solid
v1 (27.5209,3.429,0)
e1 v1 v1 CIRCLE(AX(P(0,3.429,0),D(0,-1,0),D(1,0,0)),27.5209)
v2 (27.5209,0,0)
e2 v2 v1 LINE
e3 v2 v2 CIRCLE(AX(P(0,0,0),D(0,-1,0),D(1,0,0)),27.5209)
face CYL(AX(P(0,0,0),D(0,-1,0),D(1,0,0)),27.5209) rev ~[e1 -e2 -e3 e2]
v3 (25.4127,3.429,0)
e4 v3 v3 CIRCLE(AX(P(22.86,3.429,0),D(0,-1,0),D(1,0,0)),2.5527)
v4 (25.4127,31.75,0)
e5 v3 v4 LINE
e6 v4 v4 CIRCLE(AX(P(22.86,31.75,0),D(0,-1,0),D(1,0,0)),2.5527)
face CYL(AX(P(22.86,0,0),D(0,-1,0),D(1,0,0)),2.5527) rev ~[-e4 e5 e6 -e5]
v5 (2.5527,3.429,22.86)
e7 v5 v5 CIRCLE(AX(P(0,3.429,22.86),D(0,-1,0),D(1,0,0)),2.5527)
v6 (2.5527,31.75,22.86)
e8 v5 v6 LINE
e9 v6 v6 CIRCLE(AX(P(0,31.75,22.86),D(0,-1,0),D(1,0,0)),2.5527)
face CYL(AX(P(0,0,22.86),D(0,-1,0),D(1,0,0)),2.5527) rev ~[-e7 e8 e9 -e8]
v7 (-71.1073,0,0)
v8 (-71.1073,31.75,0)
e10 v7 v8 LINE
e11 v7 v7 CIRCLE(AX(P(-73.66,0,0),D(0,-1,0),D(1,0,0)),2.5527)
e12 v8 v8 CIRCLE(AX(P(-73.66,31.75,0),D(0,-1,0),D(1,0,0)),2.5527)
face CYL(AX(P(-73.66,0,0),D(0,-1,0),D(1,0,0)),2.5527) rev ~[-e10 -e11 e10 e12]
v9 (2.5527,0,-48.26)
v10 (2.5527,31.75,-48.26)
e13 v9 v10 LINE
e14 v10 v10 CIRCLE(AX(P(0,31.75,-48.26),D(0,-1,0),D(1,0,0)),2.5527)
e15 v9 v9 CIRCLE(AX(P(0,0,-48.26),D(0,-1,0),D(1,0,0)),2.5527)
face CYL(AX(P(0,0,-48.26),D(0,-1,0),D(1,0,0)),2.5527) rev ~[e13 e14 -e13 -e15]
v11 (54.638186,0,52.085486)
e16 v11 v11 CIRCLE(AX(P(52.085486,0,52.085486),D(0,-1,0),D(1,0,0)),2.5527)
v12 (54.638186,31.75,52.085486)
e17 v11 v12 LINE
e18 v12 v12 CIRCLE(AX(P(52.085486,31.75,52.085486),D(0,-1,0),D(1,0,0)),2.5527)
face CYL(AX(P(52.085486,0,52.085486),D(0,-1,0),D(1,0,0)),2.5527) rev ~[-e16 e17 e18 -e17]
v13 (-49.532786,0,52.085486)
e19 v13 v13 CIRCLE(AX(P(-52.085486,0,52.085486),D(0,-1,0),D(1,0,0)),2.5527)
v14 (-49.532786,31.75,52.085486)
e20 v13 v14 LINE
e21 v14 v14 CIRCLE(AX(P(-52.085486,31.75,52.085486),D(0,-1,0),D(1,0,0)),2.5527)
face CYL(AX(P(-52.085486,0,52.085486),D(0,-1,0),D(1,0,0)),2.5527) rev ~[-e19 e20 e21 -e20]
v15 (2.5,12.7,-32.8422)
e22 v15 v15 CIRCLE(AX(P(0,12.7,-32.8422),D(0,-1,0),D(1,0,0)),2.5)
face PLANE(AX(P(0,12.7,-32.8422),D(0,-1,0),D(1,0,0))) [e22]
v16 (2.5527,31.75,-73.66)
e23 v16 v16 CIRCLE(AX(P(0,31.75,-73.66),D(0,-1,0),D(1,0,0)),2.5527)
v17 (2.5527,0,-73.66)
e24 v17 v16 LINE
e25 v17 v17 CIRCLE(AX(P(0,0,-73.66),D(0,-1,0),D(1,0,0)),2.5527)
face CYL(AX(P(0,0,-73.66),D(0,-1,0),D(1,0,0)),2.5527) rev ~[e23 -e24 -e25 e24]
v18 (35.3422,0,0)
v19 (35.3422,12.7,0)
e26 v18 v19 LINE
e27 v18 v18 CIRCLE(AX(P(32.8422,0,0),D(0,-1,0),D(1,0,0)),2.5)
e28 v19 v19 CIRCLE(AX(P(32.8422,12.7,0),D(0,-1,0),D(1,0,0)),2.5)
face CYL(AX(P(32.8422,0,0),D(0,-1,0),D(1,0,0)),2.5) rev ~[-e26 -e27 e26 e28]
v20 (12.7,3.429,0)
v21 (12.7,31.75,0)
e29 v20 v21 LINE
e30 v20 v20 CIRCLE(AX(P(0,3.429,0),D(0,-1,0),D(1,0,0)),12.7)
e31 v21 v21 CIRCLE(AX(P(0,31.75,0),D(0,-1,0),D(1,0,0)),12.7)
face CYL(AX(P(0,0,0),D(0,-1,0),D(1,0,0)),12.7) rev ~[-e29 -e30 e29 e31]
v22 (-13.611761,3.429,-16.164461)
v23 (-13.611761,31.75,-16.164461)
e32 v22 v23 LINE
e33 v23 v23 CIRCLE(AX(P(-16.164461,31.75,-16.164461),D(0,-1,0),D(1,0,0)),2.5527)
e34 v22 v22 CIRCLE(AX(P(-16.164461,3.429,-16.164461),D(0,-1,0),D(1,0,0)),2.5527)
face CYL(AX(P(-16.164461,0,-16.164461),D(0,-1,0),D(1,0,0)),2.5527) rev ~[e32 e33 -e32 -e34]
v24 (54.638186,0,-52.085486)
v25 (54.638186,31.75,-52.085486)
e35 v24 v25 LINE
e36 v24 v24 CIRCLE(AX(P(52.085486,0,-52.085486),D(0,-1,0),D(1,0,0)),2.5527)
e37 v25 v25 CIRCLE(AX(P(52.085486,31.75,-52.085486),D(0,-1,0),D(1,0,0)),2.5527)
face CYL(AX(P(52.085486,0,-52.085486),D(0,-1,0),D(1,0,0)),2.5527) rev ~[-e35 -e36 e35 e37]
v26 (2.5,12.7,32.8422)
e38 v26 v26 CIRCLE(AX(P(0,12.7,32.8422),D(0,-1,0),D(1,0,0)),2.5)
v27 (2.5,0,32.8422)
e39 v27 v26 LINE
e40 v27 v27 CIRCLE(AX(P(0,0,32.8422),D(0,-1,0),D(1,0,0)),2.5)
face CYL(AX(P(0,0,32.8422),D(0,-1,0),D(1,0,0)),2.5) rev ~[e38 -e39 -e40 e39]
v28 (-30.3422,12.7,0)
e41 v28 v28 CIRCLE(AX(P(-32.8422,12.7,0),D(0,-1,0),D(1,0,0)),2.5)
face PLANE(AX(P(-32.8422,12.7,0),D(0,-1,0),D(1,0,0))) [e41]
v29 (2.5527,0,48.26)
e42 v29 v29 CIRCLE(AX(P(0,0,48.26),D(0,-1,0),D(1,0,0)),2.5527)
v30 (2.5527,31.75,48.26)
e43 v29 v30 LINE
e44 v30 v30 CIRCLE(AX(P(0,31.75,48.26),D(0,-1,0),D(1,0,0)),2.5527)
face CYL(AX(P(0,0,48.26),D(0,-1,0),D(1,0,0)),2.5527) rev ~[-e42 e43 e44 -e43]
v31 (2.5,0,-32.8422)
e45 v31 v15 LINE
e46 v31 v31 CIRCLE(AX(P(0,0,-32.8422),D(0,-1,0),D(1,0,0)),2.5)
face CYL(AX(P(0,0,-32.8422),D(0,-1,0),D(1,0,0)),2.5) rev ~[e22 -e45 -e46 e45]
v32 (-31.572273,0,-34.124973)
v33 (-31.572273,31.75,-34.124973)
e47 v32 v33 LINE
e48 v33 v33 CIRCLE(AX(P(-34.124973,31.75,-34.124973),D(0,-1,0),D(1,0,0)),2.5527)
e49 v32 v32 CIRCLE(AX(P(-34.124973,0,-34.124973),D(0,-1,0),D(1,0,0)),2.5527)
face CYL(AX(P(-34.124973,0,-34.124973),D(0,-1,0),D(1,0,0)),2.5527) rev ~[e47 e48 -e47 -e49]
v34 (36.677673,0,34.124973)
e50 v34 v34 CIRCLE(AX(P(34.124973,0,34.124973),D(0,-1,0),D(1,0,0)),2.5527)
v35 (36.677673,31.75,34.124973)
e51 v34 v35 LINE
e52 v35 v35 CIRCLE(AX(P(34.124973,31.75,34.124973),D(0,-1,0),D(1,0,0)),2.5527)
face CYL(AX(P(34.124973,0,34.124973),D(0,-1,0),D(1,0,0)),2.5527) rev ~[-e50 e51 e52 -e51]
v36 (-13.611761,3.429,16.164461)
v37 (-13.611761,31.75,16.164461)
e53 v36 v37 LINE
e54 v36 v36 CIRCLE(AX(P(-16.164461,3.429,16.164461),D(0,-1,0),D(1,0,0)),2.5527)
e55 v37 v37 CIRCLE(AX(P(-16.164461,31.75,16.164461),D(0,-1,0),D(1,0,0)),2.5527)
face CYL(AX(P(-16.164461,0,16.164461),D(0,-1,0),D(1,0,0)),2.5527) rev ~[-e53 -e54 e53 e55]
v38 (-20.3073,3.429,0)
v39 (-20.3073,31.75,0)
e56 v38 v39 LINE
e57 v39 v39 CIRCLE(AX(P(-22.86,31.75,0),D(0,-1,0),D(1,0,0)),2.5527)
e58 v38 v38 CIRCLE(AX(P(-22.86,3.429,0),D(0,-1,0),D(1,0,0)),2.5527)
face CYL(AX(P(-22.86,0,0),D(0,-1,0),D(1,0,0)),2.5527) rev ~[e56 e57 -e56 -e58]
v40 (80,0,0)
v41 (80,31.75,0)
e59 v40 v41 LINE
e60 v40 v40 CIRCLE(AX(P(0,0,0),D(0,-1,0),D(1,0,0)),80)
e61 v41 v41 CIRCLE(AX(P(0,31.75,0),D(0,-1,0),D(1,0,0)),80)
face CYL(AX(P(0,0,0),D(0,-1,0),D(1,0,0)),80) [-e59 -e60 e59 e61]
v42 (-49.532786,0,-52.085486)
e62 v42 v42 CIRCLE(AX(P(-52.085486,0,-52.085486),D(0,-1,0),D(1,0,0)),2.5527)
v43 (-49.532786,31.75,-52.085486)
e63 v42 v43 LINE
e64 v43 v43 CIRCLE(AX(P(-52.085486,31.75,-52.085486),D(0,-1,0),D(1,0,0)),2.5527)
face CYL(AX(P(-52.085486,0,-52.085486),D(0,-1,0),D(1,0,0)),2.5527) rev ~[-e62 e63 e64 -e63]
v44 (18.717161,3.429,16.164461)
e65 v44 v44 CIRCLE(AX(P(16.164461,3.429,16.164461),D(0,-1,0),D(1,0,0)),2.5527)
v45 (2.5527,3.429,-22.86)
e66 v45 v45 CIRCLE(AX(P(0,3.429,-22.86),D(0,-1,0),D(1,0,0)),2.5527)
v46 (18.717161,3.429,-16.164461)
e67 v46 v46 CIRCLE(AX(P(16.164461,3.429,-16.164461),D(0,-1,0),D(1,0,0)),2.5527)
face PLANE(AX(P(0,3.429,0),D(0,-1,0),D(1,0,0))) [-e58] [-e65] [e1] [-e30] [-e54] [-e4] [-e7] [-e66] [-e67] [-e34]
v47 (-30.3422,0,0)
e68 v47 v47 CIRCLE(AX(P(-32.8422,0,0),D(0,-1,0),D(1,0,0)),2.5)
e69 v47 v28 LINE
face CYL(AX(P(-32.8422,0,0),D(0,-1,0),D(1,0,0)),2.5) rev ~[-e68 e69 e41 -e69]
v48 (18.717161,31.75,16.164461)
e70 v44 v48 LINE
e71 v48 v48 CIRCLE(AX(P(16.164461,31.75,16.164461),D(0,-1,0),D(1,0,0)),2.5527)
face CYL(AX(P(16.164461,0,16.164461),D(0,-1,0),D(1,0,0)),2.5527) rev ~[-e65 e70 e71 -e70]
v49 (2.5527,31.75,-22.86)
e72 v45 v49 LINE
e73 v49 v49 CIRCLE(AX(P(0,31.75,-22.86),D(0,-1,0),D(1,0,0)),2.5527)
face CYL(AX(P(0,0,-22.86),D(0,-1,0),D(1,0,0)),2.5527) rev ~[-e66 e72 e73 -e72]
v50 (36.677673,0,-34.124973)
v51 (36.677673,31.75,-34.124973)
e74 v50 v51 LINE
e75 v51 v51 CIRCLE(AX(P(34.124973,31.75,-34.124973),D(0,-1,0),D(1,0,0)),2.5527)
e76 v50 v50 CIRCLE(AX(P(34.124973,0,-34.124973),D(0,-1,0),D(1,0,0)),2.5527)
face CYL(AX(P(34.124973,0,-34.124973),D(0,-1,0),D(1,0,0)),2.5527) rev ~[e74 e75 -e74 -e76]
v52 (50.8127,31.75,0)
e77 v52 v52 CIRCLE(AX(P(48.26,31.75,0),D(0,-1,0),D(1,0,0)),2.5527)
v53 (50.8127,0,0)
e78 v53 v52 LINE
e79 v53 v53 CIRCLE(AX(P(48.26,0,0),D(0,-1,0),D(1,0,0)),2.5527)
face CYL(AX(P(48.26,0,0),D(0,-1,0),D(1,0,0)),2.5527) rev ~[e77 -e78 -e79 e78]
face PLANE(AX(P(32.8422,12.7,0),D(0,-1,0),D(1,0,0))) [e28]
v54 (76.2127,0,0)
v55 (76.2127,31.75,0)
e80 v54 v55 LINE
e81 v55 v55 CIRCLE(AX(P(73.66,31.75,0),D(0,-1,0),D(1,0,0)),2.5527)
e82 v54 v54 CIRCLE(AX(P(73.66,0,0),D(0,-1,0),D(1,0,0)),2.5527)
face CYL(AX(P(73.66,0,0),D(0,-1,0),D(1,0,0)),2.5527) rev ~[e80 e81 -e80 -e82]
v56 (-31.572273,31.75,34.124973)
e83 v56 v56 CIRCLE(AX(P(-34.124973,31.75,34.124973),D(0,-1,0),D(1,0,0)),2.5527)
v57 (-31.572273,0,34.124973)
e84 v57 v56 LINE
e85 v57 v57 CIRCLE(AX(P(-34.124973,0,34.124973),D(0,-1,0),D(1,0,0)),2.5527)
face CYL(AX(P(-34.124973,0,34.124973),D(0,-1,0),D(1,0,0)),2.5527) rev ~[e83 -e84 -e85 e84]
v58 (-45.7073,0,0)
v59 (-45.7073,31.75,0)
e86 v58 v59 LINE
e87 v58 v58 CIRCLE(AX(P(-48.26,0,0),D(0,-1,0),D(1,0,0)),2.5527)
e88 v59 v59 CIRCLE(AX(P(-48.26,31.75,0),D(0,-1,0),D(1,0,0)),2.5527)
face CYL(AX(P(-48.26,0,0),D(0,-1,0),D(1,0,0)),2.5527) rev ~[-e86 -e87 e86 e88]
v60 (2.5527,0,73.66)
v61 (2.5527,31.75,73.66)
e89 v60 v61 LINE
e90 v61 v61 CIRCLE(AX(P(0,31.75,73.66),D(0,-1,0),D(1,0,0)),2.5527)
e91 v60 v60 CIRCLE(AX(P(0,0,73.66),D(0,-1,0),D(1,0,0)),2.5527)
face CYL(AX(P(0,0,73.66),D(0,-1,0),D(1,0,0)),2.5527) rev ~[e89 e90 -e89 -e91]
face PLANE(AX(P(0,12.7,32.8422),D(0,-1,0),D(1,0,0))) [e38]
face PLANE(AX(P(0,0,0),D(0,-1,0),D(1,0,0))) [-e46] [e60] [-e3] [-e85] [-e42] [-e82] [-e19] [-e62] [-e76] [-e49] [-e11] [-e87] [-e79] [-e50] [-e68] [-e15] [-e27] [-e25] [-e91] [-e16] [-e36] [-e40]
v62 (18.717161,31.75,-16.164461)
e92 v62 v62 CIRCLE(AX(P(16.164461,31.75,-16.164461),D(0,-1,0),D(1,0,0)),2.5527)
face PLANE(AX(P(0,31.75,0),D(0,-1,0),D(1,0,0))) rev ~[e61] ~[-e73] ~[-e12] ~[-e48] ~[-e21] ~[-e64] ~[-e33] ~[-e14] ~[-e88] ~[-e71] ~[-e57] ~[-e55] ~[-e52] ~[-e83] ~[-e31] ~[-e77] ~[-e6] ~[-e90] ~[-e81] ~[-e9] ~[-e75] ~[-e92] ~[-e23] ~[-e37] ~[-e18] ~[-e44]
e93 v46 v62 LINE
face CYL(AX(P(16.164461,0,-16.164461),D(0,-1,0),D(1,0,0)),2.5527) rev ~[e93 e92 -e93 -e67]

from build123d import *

# Parameters (mm, degrees)
F0_R     = 80
F0_R_2   = 2.5527
F0_R_3   = 39.9796
F0_R_4   = 2.5
F0_R_5   = 27.5209
F0_R_6   = 12.7
F1_DEPTH = 31.75
F2_DEPTH = 12.7
F3_DEPTH = 3.429


# Not quite as in the source:
# - a feature names something its author has since deleted; it is built from what else it names


with BuildPart() as f1:
    # F0 (on Front) → F1 (new body)
    with BuildSketch(Plane.XZ):
        Circle(F0_R)
        with Locations((-52.0854855022, -52.0854855022)):
            Circle(F0_R_2, mode=Mode.SUBTRACT)
        with Locations((-34.1249732601, -34.1249732601)):
            Circle(F0_R_2, mode=Mode.SUBTRACT)
        with Locations((0, -73.66)):
            Circle(F0_R_2, mode=Mode.SUBTRACT)
        with Locations((0, -48.26)):
            Circle(F0_R_2, mode=Mode.SUBTRACT)
        with Locations((52.0854855022, -52.0854855022)):
            Circle(F0_R_2, mode=Mode.SUBTRACT)
        with Locations((34.1249732601, -34.1249732601)):
            Circle(F0_R_2, mode=Mode.SUBTRACT)
        with Locations((-73.66, 0)):
            Circle(F0_R_2, mode=Mode.SUBTRACT)
        with Locations((-48.26, 0)):
            Circle(F0_R_2, mode=Mode.SUBTRACT)
        with Locations((-34.1249732601, 34.1249732601)):
            Circle(F0_R_2, mode=Mode.SUBTRACT)
        with Locations((-52.0854855022, 52.0854855022)):
            Circle(F0_R_2, mode=Mode.SUBTRACT)
        Circle(F0_R_3, mode=Mode.SUBTRACT)
        with Locations((34.1249732601, 34.1249732601)):
            Circle(F0_R_2, mode=Mode.SUBTRACT)
        with Locations((48.26, 0)):
            Circle(F0_R_2, mode=Mode.SUBTRACT)
        with Locations((73.66, 0)):
            Circle(F0_R_2, mode=Mode.SUBTRACT)
        with Locations((0, 48.26)):
            Circle(F0_R_2, mode=Mode.SUBTRACT)
        with Locations((0, 73.66)):
            Circle(F0_R_2, mode=Mode.SUBTRACT)
        with Locations((52.0854855022, 52.0854855022)):
            Circle(F0_R_2, mode=Mode.SUBTRACT)
        Circle(F0_R_3)
        with Locations((0, -32.8422)):
            Circle(F0_R_4, mode=Mode.SUBTRACT)
        with Locations((-32.8422, 0)):
            Circle(F0_R_4, mode=Mode.SUBTRACT)
        Circle(F0_R_5, mode=Mode.SUBTRACT)
        with Locations((32.8422, 0)):
            Circle(F0_R_4, mode=Mode.SUBTRACT)
        with Locations((0, 32.8422)):
            Circle(F0_R_4, mode=Mode.SUBTRACT)
        Circle(F0_R_5)
        with Locations((-16.1644610179, -16.1644610179)):
            Circle(F0_R_2, mode=Mode.SUBTRACT)
        with Locations((0, -22.86)):
            Circle(F0_R_2, mode=Mode.SUBTRACT)
        with Locations((16.1644610179, -16.1644610179)):
            Circle(F0_R_2, mode=Mode.SUBTRACT)
        with Locations((-22.86, 0)):
            Circle(F0_R_2, mode=Mode.SUBTRACT)
        with Locations((-16.1644610179, 16.1644610179)):
            Circle(F0_R_2, mode=Mode.SUBTRACT)
        Circle(F0_R_6, mode=Mode.SUBTRACT)
        with Locations((16.1644610179, 16.1644610179)):
            Circle(F0_R_2, mode=Mode.SUBTRACT)
        with Locations((22.86, 0)):
            Circle(F0_R_2, mode=Mode.SUBTRACT)
        with Locations((0, 22.86)):
            Circle(F0_R_2, mode=Mode.SUBTRACT)
        with Locations((0, 32.8422)):
            Circle(F0_R_4)
        with Locations((0, -32.8422)):
            Circle(F0_R_4)
        with Locations((32.8422, 0)):
            Circle(F0_R_4)
        with Locations((-32.8422, 0)):
            Circle(F0_R_4)
    extrude(amount=-F1_DEPTH)

    # F0 (on Front) → F2 (cut)
    with BuildSketch(Plane.XZ):
        with Locations((0, 32.8422)):
            Circle(F0_R_4)
        with Locations((32.8422, 0)):
            Circle(F0_R_4)
        with Locations((0, -32.8422)):
            Circle(F0_R_4)
        with Locations((-32.8422, 0)):
            Circle(F0_R_4)
    extrude(amount=-F2_DEPTH, mode=Mode.SUBTRACT)

    # F0 (on Front) → F3 (cut)
    with BuildSketch(Plane.XZ):
        Circle(F0_R_5)
        with Locations((-16.1644610179, -16.1644610179)):
            Circle(F0_R_2, mode=Mode.SUBTRACT)
        with Locations((0, -22.86)):
            Circle(F0_R_2, mode=Mode.SUBTRACT)
        with Locations((16.1644610179, -16.1644610179)):
            Circle(F0_R_2, mode=Mode.SUBTRACT)
        with Locations((-22.86, 0)):
            Circle(F0_R_2, mode=Mode.SUBTRACT)
        with Locations((-16.1644610179, 16.1644610179)):
            Circle(F0_R_2, mode=Mode.SUBTRACT)
        Circle(F0_R_6, mode=Mode.SUBTRACT)
        with Locations((16.1644610179, 16.1644610179)):
            Circle(F0_R_2, mode=Mode.SUBTRACT)
        with Locations((22.86, 0)):
            Circle(F0_R_2, mode=Mode.SUBTRACT)
        with Locations((0, 22.86)):
            Circle(F0_R_2, mode=Mode.SUBTRACT)
    extrude(amount=-F3_DEPTH, mode=Mode.SUBTRACT)


solid = f1.part
